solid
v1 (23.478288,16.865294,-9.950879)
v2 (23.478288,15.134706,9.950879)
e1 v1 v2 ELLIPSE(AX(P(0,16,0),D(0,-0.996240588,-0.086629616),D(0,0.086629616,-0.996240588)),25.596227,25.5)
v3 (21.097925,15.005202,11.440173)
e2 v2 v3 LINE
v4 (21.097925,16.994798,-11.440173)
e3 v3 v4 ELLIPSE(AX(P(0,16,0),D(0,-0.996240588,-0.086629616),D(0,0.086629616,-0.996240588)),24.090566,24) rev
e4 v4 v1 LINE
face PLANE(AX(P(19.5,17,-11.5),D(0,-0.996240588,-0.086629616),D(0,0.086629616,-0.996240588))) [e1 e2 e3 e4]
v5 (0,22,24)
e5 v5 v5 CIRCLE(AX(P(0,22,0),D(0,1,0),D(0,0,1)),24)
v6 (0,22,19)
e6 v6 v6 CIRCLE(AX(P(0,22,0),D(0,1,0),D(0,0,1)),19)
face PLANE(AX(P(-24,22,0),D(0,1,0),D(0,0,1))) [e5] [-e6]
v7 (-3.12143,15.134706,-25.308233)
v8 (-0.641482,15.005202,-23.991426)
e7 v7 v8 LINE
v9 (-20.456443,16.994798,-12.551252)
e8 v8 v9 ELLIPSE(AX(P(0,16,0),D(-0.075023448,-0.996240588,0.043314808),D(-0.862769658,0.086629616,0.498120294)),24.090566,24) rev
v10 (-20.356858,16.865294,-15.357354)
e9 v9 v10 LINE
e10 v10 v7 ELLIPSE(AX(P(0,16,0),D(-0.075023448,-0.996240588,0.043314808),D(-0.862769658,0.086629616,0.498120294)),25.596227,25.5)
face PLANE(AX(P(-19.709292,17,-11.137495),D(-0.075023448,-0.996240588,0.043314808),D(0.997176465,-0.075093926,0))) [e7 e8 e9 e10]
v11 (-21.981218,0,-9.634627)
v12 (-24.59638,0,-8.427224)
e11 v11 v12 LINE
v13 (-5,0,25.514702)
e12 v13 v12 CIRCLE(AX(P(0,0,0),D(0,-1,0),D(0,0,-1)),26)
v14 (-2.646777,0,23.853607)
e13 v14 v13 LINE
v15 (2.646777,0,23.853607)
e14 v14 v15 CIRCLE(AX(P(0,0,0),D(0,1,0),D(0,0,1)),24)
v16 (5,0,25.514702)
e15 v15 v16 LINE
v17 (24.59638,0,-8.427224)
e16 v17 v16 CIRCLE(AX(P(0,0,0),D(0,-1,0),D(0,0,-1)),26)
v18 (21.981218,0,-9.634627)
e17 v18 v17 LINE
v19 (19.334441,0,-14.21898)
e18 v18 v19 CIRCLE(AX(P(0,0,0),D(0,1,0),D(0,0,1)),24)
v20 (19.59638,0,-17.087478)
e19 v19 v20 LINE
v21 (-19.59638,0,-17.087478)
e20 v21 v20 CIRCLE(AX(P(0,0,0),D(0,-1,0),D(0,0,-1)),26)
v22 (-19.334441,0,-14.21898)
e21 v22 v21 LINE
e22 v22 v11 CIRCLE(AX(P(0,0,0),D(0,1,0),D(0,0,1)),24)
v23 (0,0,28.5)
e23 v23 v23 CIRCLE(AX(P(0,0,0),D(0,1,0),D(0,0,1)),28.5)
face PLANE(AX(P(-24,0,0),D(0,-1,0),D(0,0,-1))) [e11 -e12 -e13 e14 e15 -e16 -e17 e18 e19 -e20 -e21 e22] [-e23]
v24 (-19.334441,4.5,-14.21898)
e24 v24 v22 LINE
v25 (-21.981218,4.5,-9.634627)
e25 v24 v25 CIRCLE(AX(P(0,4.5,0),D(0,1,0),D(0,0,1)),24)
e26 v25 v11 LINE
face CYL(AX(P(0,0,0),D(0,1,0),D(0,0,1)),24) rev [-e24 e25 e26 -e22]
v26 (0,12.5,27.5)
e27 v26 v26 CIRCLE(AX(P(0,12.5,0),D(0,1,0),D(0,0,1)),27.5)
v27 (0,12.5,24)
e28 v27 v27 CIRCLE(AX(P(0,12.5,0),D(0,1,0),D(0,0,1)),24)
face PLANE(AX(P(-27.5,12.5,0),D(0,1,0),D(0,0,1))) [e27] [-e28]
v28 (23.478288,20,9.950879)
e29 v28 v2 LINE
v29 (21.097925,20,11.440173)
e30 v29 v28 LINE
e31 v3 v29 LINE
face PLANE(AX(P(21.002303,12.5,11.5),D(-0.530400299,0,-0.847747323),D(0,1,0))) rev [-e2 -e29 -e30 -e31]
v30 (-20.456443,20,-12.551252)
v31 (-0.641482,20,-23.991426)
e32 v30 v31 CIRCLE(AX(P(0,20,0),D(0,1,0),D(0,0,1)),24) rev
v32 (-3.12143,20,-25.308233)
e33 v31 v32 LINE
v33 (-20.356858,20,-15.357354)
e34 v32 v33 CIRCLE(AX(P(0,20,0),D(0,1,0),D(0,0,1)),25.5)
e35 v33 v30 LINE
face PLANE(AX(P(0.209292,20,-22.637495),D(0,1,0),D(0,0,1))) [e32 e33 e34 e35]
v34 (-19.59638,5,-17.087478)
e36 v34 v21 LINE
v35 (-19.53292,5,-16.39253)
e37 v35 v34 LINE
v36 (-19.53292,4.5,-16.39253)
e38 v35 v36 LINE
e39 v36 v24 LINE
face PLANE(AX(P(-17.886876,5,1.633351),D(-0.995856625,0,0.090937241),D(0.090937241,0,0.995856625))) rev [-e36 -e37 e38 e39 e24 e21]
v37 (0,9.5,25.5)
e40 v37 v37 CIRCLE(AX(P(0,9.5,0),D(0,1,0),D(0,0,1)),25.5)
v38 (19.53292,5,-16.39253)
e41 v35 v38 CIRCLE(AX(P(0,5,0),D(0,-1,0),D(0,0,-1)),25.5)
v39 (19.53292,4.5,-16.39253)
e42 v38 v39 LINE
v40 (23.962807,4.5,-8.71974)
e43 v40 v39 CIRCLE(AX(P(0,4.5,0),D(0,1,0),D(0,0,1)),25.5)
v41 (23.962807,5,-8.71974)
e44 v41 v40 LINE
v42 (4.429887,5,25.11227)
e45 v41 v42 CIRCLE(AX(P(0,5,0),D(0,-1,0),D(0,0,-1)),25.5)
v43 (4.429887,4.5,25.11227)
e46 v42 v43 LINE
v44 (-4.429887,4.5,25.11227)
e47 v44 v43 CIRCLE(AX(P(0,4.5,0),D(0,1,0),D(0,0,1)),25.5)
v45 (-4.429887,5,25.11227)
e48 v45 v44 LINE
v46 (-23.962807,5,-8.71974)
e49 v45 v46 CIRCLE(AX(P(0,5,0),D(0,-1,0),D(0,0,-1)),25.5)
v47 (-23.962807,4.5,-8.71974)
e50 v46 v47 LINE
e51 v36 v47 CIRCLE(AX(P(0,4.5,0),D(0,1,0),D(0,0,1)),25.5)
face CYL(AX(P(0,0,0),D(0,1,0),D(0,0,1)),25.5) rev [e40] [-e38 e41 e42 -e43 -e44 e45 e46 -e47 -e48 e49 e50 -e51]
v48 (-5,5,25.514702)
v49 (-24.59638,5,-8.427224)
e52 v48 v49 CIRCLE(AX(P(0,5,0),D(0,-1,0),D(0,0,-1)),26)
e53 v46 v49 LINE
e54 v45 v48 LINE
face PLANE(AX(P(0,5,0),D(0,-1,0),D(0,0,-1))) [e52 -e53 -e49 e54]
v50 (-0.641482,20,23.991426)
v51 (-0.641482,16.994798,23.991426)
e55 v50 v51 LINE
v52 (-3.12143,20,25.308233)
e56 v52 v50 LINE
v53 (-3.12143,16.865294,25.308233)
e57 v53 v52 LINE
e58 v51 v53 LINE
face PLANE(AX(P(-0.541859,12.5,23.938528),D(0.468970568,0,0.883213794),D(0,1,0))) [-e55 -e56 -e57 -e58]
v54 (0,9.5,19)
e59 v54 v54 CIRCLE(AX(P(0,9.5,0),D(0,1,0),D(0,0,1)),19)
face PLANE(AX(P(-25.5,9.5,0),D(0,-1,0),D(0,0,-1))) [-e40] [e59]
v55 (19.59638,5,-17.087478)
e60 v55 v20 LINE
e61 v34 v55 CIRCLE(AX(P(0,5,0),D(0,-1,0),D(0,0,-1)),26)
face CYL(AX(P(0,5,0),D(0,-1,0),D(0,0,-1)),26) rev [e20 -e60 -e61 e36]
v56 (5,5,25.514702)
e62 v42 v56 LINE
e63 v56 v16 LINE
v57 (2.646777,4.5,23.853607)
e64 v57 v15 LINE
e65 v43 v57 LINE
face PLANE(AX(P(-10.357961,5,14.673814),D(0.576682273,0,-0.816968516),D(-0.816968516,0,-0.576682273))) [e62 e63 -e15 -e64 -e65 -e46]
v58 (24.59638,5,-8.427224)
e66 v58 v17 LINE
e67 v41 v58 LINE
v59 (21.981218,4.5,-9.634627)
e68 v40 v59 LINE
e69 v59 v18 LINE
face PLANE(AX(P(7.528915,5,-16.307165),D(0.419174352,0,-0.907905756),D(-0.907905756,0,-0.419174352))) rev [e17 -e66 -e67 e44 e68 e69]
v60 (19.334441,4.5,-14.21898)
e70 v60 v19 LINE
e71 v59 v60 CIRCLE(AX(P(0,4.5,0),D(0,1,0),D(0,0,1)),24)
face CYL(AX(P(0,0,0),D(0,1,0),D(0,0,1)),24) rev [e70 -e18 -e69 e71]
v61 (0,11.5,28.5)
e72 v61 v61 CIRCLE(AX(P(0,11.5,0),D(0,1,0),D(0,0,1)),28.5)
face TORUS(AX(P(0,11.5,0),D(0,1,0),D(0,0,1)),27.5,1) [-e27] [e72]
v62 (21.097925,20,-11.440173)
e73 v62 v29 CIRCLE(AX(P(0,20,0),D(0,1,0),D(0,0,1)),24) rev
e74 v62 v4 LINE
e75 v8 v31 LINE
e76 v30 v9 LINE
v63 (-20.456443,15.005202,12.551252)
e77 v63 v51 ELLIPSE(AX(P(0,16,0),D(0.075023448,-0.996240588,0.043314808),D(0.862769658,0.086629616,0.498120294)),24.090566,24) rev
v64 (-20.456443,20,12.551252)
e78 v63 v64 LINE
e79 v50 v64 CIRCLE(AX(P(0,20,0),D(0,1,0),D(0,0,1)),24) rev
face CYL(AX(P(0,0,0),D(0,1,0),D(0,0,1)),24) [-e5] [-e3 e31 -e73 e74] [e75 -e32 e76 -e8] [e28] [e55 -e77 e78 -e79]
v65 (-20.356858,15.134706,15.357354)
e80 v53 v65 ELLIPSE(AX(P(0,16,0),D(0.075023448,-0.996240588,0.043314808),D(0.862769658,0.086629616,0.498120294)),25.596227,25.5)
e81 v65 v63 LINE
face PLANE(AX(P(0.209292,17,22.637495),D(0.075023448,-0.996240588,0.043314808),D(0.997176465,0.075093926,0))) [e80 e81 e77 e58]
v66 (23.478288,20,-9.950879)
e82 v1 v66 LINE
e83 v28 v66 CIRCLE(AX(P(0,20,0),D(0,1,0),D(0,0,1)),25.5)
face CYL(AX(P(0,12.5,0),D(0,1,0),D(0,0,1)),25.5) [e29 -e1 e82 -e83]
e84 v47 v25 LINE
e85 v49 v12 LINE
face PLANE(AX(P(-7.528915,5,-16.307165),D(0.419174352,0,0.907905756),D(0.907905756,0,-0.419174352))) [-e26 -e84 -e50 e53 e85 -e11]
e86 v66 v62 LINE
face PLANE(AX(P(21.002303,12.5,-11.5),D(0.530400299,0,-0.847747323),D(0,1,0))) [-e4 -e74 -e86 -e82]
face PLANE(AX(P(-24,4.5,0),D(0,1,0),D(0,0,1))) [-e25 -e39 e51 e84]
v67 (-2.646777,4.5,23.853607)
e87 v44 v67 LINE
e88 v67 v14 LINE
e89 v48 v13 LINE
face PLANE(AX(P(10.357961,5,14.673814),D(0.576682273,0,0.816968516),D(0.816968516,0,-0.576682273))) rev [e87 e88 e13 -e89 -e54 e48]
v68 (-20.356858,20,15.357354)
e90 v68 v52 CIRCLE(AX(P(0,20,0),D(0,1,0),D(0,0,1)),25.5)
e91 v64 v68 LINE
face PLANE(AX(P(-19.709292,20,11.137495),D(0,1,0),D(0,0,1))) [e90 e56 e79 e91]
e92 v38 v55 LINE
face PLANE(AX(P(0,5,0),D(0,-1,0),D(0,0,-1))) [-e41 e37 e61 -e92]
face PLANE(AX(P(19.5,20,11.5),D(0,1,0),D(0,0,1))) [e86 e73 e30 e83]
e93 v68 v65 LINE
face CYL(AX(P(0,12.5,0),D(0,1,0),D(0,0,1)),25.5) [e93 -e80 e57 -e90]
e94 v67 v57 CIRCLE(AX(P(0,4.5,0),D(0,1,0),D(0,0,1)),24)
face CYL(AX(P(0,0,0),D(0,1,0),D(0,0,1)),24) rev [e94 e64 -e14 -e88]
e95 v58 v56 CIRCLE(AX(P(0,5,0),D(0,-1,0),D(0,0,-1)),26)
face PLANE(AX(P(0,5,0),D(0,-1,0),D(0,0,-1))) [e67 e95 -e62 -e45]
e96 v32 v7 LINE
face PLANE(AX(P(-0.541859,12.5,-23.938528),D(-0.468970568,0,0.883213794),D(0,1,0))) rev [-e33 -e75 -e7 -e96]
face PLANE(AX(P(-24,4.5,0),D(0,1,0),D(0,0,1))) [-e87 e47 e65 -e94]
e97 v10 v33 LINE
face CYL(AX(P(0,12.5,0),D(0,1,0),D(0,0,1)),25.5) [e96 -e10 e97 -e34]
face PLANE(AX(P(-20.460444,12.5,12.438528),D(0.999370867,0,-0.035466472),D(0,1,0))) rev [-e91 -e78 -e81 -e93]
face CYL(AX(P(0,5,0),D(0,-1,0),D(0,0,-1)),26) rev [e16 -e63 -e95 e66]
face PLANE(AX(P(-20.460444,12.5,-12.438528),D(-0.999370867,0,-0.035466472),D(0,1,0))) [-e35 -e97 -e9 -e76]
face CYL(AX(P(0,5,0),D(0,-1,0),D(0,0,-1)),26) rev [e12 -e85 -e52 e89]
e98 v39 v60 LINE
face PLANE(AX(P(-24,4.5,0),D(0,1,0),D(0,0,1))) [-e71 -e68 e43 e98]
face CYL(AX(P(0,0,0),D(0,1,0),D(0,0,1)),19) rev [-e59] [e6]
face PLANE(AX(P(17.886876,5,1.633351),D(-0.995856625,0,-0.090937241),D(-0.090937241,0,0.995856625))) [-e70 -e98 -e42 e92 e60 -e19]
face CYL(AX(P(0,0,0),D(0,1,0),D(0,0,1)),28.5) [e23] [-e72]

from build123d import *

# Parameters (mm, degrees)
CUT_EXTRUDE_1_DEPTH      = 5
EXTRUDE_1_DEPTH          = 6
PATTERN_CIRCULAR_1_COUNT = 3
SKETCH_4_R               = 42.404307435
SKETCH_4_R_2             = 25.5
CUT_EXTRUDE_2_DEPTH      = 9.5
CHAMFER_START            = 14
CHAMFER_1_DEPTH          = 6


with BuildPart() as part:
    # Эскиз1 → Повернуть1 (revolve)
    with BuildSketch(Plane.XY, mode=Mode.PRIVATE) as revolve_1_sk:
        with BuildLine():
            Line((-24, 0), (-24, 4.5))
            Line((-24, 4.5), (-25.5, 4.5))
            Line((-25.5, 4.5), (-25.5, 9.5))
            Line((-25.5, 9.5), (-19, 9.5))
            Line((-19, 9.5), (-19, 22))
            Line((-19, 22), (-24, 22))
            Line((-24, 22), (-24, 12.5))
            Line((-24, 12.5), (-27.5, 12.5))
            ThreePointArc((-27.5, 12.5), (-28.207106781, 12.207106781), (-28.5, 11.5))
            Line((-28.5, 11.5), (-28.5, 0))
            Line((-28.5, 0), (-24, 0))
        make_face()
    revolve(revolve_1_sk.sketch.rotate(Axis((0, 0, 0), (0, -1, 0)), 270), axis=Axis((0, 0, 0), (0, -1, 0)))

    # Эскиз2 → Вырез-Вытянуть1 (cut)
    with BuildSketch(Plane(origin=(0, 0, 0), x_dir=(-1, 0, 0), z_dir=(0, -1, 0))):
        with BuildLine():
            ThreePointArc((24, 0), (17.8818714, -16.007456864), (2.646777063, -23.85360709))
            Line((2.646777063, -23.85360709), (5, -25.514701644))
            ThreePointArc((5, -25.514701644), (20.0748599, -16.522711642), (26, 0))
            ThreePointArc((26, 0), (25.646694472, 4.271658071), (24.596379794, 8.427223803))
            Line((24.596379794, 8.427223803), (21.981218243, 9.63462737))
            ThreePointArc((21.981218243, 9.63462737), (23.489883331, 4.921928594), (24, 0))
        make_face()
        with BuildLine():
            Line((-5, -25.514701644), (-2.646777063, -23.85360709))
            ThreePointArc((-2.646777063, -23.85360709), (-20.784609691, -12), (-21.981218243, 9.63462737))
            Line((-21.981218243, 9.63462737), (-24.596379794, 8.427223803))
            ThreePointArc((-24.596379794, 8.427223803), (-22.516660498, -13), (-5, -25.514701644))
        make_face()
        with BuildLine():
            Line((-19.596379794, 17.087477841), (-19.33444118, 14.218979719))
            ThreePointArc((-19.33444118, 14.218979719), (0, 24), (19.33444118, 14.218979719))
            Line((19.33444118, 14.218979719), (19.596379794, 17.087477841))
            ThreePointArc((19.596379794, 17.087477841), (0, 26), (-19.596379794, 17.087477841))
        make_face()
    extrude(amount=-CUT_EXTRUDE_1_DEPTH, mode=Mode.SUBTRACT)

    # Эскиз3 → Бобышка-Вытянуть1 (add)
    with BuildSketch(Plane(origin=(25.5, 0, 0), x_dir=(0, 0, -1), z_dir=(1, 0, 0))):
        Polygon((-11.5, 20), (11.5, 20), (11.5, 17), (-11.5, 15), align=None)
    extrude_1 = extrude(amount=-EXTRUDE_1_DEPTH)

    # Круговой массив1: Бобышка-Вытянуть1 ×3 about axis
    pattern_circular_1_axis = Axis((0, 0, 0), (0, 1, 0))
    for i in range(1, PATTERN_CIRCULAR_1_COUNT):
        add(extrude_1.rotate(pattern_circular_1_axis, i * 360 / PATTERN_CIRCULAR_1_COUNT))

    # Эскиз4 → Вырез-Вытянуть2 (cut)
    with BuildSketch(Plane(origin=(0, 22, 0), x_dir=(1, 0, 0), z_dir=(0, 1, 0))):
        Circle(SKETCH_4_R)
        with Locations(Location((0, 0, 0), (0, 0, 270))):
            Circle(SKETCH_4_R_2, mode=Mode.SUBTRACT)
    extrude(amount=-CUT_EXTRUDE_2_DEPTH, mode=Mode.SUBTRACT)

    # Фаска1: read off the stored shape, not the designer's step
    # Фаска1 outline → Фаска1 (cut)
    with BuildSketch(Plane(origin=(0, 0, 0), x_dir=(1, 0, 0), z_dir=(0, 1, 0)).offset(CHAMFER_START)):
        with BuildLine():
            Line((-20.456443185, 12.551252218), (-20.356857991, 15.357354354))
            ThreePointArc((-20.356857991, 15.357354354), (-20.859675731, 14.667103612), (-21.33909882, 13.960403344))
            Line((-21.33909882, 13.960403344), (-20.49197936, 12.493149399))
            ThreePointArc((-20.49197936, 12.493149399), (-20.474231883, 12.522213414), (-20.456443185, 12.551252218))
        make_face()
        with BuildLine():
            ThreePointArc((-1.420514533, 25.460403344), (-2.272246462, 25.398560904), (-3.12143001, 25.308233338))
            Line((-3.12143001, 25.308233338), (-0.641481678, 23.991425578))
            ThreePointArc((-0.641481678, 23.991425578), (-0.607438987, 23.992311641), (-0.573395073, 23.993149399))
            Line((-0.573395073, 23.993149399), (-1.420514533, 25.460403344))
        make_face()
        with BuildLine():
            ThreePointArc((-20.456443185, -12.551252218), (-20.474231883, -12.522213414), (-20.49197936, -12.493149399))
            Line((-20.49197936, -12.493149399), (-21.33909882, -13.960403344))
            ThreePointArc((-21.33909882, -13.960403344), (-20.859675731, -14.667103612), (-20.356857991, -15.357354354))
            Line((-20.356857991, -15.357354354), (-20.456443185, -12.551252218))
        make_face()
        with BuildLine():
            Line((22.759613353, 11.5), (21.065374433, 11.5))
            ThreePointArc((21.065374433, 11.5), (21.08167087, 11.470098227), (21.097924862, 11.44017336))
            Line((21.097924862, 11.44017336), (23.478288, 9.950878984))
            ThreePointArc((23.478288, 9.950878984), (23.131922194, 10.731457292), (22.759613353, 11.5))
        make_face()
        with BuildLine():
            ThreePointArc((-0.573395073, -23.993149399), (-0.607438987, -23.992311641), (-0.641481678, -23.991425578))
            Line((-0.641481678, -23.991425578), (-3.12143001, -25.308233338))
            ThreePointArc((-3.12143001, -25.308233338), (-2.272246462, -25.398560904), (-1.420514533, -25.460403344))
            Line((-1.420514533, -25.460403344), (-0.573395073, -23.993149399))
        make_face()
        with BuildLine():
            ThreePointArc((22.759613353, -11.5), (23.131922194, -10.731457292), (23.478288, -9.950878984))
            Line((23.478288, -9.950878984), (21.097924862, -11.44017336))
            ThreePointArc((21.097924862, -11.44017336), (21.08167087, -11.470098227), (21.065374433, -11.5))
            Line((21.065374433, -11.5), (22.759613353, -11.5))
        make_face()
    extrude(amount=CHAMFER_1_DEPTH, mode=Mode.SUBTRACT)


solid = part.part
